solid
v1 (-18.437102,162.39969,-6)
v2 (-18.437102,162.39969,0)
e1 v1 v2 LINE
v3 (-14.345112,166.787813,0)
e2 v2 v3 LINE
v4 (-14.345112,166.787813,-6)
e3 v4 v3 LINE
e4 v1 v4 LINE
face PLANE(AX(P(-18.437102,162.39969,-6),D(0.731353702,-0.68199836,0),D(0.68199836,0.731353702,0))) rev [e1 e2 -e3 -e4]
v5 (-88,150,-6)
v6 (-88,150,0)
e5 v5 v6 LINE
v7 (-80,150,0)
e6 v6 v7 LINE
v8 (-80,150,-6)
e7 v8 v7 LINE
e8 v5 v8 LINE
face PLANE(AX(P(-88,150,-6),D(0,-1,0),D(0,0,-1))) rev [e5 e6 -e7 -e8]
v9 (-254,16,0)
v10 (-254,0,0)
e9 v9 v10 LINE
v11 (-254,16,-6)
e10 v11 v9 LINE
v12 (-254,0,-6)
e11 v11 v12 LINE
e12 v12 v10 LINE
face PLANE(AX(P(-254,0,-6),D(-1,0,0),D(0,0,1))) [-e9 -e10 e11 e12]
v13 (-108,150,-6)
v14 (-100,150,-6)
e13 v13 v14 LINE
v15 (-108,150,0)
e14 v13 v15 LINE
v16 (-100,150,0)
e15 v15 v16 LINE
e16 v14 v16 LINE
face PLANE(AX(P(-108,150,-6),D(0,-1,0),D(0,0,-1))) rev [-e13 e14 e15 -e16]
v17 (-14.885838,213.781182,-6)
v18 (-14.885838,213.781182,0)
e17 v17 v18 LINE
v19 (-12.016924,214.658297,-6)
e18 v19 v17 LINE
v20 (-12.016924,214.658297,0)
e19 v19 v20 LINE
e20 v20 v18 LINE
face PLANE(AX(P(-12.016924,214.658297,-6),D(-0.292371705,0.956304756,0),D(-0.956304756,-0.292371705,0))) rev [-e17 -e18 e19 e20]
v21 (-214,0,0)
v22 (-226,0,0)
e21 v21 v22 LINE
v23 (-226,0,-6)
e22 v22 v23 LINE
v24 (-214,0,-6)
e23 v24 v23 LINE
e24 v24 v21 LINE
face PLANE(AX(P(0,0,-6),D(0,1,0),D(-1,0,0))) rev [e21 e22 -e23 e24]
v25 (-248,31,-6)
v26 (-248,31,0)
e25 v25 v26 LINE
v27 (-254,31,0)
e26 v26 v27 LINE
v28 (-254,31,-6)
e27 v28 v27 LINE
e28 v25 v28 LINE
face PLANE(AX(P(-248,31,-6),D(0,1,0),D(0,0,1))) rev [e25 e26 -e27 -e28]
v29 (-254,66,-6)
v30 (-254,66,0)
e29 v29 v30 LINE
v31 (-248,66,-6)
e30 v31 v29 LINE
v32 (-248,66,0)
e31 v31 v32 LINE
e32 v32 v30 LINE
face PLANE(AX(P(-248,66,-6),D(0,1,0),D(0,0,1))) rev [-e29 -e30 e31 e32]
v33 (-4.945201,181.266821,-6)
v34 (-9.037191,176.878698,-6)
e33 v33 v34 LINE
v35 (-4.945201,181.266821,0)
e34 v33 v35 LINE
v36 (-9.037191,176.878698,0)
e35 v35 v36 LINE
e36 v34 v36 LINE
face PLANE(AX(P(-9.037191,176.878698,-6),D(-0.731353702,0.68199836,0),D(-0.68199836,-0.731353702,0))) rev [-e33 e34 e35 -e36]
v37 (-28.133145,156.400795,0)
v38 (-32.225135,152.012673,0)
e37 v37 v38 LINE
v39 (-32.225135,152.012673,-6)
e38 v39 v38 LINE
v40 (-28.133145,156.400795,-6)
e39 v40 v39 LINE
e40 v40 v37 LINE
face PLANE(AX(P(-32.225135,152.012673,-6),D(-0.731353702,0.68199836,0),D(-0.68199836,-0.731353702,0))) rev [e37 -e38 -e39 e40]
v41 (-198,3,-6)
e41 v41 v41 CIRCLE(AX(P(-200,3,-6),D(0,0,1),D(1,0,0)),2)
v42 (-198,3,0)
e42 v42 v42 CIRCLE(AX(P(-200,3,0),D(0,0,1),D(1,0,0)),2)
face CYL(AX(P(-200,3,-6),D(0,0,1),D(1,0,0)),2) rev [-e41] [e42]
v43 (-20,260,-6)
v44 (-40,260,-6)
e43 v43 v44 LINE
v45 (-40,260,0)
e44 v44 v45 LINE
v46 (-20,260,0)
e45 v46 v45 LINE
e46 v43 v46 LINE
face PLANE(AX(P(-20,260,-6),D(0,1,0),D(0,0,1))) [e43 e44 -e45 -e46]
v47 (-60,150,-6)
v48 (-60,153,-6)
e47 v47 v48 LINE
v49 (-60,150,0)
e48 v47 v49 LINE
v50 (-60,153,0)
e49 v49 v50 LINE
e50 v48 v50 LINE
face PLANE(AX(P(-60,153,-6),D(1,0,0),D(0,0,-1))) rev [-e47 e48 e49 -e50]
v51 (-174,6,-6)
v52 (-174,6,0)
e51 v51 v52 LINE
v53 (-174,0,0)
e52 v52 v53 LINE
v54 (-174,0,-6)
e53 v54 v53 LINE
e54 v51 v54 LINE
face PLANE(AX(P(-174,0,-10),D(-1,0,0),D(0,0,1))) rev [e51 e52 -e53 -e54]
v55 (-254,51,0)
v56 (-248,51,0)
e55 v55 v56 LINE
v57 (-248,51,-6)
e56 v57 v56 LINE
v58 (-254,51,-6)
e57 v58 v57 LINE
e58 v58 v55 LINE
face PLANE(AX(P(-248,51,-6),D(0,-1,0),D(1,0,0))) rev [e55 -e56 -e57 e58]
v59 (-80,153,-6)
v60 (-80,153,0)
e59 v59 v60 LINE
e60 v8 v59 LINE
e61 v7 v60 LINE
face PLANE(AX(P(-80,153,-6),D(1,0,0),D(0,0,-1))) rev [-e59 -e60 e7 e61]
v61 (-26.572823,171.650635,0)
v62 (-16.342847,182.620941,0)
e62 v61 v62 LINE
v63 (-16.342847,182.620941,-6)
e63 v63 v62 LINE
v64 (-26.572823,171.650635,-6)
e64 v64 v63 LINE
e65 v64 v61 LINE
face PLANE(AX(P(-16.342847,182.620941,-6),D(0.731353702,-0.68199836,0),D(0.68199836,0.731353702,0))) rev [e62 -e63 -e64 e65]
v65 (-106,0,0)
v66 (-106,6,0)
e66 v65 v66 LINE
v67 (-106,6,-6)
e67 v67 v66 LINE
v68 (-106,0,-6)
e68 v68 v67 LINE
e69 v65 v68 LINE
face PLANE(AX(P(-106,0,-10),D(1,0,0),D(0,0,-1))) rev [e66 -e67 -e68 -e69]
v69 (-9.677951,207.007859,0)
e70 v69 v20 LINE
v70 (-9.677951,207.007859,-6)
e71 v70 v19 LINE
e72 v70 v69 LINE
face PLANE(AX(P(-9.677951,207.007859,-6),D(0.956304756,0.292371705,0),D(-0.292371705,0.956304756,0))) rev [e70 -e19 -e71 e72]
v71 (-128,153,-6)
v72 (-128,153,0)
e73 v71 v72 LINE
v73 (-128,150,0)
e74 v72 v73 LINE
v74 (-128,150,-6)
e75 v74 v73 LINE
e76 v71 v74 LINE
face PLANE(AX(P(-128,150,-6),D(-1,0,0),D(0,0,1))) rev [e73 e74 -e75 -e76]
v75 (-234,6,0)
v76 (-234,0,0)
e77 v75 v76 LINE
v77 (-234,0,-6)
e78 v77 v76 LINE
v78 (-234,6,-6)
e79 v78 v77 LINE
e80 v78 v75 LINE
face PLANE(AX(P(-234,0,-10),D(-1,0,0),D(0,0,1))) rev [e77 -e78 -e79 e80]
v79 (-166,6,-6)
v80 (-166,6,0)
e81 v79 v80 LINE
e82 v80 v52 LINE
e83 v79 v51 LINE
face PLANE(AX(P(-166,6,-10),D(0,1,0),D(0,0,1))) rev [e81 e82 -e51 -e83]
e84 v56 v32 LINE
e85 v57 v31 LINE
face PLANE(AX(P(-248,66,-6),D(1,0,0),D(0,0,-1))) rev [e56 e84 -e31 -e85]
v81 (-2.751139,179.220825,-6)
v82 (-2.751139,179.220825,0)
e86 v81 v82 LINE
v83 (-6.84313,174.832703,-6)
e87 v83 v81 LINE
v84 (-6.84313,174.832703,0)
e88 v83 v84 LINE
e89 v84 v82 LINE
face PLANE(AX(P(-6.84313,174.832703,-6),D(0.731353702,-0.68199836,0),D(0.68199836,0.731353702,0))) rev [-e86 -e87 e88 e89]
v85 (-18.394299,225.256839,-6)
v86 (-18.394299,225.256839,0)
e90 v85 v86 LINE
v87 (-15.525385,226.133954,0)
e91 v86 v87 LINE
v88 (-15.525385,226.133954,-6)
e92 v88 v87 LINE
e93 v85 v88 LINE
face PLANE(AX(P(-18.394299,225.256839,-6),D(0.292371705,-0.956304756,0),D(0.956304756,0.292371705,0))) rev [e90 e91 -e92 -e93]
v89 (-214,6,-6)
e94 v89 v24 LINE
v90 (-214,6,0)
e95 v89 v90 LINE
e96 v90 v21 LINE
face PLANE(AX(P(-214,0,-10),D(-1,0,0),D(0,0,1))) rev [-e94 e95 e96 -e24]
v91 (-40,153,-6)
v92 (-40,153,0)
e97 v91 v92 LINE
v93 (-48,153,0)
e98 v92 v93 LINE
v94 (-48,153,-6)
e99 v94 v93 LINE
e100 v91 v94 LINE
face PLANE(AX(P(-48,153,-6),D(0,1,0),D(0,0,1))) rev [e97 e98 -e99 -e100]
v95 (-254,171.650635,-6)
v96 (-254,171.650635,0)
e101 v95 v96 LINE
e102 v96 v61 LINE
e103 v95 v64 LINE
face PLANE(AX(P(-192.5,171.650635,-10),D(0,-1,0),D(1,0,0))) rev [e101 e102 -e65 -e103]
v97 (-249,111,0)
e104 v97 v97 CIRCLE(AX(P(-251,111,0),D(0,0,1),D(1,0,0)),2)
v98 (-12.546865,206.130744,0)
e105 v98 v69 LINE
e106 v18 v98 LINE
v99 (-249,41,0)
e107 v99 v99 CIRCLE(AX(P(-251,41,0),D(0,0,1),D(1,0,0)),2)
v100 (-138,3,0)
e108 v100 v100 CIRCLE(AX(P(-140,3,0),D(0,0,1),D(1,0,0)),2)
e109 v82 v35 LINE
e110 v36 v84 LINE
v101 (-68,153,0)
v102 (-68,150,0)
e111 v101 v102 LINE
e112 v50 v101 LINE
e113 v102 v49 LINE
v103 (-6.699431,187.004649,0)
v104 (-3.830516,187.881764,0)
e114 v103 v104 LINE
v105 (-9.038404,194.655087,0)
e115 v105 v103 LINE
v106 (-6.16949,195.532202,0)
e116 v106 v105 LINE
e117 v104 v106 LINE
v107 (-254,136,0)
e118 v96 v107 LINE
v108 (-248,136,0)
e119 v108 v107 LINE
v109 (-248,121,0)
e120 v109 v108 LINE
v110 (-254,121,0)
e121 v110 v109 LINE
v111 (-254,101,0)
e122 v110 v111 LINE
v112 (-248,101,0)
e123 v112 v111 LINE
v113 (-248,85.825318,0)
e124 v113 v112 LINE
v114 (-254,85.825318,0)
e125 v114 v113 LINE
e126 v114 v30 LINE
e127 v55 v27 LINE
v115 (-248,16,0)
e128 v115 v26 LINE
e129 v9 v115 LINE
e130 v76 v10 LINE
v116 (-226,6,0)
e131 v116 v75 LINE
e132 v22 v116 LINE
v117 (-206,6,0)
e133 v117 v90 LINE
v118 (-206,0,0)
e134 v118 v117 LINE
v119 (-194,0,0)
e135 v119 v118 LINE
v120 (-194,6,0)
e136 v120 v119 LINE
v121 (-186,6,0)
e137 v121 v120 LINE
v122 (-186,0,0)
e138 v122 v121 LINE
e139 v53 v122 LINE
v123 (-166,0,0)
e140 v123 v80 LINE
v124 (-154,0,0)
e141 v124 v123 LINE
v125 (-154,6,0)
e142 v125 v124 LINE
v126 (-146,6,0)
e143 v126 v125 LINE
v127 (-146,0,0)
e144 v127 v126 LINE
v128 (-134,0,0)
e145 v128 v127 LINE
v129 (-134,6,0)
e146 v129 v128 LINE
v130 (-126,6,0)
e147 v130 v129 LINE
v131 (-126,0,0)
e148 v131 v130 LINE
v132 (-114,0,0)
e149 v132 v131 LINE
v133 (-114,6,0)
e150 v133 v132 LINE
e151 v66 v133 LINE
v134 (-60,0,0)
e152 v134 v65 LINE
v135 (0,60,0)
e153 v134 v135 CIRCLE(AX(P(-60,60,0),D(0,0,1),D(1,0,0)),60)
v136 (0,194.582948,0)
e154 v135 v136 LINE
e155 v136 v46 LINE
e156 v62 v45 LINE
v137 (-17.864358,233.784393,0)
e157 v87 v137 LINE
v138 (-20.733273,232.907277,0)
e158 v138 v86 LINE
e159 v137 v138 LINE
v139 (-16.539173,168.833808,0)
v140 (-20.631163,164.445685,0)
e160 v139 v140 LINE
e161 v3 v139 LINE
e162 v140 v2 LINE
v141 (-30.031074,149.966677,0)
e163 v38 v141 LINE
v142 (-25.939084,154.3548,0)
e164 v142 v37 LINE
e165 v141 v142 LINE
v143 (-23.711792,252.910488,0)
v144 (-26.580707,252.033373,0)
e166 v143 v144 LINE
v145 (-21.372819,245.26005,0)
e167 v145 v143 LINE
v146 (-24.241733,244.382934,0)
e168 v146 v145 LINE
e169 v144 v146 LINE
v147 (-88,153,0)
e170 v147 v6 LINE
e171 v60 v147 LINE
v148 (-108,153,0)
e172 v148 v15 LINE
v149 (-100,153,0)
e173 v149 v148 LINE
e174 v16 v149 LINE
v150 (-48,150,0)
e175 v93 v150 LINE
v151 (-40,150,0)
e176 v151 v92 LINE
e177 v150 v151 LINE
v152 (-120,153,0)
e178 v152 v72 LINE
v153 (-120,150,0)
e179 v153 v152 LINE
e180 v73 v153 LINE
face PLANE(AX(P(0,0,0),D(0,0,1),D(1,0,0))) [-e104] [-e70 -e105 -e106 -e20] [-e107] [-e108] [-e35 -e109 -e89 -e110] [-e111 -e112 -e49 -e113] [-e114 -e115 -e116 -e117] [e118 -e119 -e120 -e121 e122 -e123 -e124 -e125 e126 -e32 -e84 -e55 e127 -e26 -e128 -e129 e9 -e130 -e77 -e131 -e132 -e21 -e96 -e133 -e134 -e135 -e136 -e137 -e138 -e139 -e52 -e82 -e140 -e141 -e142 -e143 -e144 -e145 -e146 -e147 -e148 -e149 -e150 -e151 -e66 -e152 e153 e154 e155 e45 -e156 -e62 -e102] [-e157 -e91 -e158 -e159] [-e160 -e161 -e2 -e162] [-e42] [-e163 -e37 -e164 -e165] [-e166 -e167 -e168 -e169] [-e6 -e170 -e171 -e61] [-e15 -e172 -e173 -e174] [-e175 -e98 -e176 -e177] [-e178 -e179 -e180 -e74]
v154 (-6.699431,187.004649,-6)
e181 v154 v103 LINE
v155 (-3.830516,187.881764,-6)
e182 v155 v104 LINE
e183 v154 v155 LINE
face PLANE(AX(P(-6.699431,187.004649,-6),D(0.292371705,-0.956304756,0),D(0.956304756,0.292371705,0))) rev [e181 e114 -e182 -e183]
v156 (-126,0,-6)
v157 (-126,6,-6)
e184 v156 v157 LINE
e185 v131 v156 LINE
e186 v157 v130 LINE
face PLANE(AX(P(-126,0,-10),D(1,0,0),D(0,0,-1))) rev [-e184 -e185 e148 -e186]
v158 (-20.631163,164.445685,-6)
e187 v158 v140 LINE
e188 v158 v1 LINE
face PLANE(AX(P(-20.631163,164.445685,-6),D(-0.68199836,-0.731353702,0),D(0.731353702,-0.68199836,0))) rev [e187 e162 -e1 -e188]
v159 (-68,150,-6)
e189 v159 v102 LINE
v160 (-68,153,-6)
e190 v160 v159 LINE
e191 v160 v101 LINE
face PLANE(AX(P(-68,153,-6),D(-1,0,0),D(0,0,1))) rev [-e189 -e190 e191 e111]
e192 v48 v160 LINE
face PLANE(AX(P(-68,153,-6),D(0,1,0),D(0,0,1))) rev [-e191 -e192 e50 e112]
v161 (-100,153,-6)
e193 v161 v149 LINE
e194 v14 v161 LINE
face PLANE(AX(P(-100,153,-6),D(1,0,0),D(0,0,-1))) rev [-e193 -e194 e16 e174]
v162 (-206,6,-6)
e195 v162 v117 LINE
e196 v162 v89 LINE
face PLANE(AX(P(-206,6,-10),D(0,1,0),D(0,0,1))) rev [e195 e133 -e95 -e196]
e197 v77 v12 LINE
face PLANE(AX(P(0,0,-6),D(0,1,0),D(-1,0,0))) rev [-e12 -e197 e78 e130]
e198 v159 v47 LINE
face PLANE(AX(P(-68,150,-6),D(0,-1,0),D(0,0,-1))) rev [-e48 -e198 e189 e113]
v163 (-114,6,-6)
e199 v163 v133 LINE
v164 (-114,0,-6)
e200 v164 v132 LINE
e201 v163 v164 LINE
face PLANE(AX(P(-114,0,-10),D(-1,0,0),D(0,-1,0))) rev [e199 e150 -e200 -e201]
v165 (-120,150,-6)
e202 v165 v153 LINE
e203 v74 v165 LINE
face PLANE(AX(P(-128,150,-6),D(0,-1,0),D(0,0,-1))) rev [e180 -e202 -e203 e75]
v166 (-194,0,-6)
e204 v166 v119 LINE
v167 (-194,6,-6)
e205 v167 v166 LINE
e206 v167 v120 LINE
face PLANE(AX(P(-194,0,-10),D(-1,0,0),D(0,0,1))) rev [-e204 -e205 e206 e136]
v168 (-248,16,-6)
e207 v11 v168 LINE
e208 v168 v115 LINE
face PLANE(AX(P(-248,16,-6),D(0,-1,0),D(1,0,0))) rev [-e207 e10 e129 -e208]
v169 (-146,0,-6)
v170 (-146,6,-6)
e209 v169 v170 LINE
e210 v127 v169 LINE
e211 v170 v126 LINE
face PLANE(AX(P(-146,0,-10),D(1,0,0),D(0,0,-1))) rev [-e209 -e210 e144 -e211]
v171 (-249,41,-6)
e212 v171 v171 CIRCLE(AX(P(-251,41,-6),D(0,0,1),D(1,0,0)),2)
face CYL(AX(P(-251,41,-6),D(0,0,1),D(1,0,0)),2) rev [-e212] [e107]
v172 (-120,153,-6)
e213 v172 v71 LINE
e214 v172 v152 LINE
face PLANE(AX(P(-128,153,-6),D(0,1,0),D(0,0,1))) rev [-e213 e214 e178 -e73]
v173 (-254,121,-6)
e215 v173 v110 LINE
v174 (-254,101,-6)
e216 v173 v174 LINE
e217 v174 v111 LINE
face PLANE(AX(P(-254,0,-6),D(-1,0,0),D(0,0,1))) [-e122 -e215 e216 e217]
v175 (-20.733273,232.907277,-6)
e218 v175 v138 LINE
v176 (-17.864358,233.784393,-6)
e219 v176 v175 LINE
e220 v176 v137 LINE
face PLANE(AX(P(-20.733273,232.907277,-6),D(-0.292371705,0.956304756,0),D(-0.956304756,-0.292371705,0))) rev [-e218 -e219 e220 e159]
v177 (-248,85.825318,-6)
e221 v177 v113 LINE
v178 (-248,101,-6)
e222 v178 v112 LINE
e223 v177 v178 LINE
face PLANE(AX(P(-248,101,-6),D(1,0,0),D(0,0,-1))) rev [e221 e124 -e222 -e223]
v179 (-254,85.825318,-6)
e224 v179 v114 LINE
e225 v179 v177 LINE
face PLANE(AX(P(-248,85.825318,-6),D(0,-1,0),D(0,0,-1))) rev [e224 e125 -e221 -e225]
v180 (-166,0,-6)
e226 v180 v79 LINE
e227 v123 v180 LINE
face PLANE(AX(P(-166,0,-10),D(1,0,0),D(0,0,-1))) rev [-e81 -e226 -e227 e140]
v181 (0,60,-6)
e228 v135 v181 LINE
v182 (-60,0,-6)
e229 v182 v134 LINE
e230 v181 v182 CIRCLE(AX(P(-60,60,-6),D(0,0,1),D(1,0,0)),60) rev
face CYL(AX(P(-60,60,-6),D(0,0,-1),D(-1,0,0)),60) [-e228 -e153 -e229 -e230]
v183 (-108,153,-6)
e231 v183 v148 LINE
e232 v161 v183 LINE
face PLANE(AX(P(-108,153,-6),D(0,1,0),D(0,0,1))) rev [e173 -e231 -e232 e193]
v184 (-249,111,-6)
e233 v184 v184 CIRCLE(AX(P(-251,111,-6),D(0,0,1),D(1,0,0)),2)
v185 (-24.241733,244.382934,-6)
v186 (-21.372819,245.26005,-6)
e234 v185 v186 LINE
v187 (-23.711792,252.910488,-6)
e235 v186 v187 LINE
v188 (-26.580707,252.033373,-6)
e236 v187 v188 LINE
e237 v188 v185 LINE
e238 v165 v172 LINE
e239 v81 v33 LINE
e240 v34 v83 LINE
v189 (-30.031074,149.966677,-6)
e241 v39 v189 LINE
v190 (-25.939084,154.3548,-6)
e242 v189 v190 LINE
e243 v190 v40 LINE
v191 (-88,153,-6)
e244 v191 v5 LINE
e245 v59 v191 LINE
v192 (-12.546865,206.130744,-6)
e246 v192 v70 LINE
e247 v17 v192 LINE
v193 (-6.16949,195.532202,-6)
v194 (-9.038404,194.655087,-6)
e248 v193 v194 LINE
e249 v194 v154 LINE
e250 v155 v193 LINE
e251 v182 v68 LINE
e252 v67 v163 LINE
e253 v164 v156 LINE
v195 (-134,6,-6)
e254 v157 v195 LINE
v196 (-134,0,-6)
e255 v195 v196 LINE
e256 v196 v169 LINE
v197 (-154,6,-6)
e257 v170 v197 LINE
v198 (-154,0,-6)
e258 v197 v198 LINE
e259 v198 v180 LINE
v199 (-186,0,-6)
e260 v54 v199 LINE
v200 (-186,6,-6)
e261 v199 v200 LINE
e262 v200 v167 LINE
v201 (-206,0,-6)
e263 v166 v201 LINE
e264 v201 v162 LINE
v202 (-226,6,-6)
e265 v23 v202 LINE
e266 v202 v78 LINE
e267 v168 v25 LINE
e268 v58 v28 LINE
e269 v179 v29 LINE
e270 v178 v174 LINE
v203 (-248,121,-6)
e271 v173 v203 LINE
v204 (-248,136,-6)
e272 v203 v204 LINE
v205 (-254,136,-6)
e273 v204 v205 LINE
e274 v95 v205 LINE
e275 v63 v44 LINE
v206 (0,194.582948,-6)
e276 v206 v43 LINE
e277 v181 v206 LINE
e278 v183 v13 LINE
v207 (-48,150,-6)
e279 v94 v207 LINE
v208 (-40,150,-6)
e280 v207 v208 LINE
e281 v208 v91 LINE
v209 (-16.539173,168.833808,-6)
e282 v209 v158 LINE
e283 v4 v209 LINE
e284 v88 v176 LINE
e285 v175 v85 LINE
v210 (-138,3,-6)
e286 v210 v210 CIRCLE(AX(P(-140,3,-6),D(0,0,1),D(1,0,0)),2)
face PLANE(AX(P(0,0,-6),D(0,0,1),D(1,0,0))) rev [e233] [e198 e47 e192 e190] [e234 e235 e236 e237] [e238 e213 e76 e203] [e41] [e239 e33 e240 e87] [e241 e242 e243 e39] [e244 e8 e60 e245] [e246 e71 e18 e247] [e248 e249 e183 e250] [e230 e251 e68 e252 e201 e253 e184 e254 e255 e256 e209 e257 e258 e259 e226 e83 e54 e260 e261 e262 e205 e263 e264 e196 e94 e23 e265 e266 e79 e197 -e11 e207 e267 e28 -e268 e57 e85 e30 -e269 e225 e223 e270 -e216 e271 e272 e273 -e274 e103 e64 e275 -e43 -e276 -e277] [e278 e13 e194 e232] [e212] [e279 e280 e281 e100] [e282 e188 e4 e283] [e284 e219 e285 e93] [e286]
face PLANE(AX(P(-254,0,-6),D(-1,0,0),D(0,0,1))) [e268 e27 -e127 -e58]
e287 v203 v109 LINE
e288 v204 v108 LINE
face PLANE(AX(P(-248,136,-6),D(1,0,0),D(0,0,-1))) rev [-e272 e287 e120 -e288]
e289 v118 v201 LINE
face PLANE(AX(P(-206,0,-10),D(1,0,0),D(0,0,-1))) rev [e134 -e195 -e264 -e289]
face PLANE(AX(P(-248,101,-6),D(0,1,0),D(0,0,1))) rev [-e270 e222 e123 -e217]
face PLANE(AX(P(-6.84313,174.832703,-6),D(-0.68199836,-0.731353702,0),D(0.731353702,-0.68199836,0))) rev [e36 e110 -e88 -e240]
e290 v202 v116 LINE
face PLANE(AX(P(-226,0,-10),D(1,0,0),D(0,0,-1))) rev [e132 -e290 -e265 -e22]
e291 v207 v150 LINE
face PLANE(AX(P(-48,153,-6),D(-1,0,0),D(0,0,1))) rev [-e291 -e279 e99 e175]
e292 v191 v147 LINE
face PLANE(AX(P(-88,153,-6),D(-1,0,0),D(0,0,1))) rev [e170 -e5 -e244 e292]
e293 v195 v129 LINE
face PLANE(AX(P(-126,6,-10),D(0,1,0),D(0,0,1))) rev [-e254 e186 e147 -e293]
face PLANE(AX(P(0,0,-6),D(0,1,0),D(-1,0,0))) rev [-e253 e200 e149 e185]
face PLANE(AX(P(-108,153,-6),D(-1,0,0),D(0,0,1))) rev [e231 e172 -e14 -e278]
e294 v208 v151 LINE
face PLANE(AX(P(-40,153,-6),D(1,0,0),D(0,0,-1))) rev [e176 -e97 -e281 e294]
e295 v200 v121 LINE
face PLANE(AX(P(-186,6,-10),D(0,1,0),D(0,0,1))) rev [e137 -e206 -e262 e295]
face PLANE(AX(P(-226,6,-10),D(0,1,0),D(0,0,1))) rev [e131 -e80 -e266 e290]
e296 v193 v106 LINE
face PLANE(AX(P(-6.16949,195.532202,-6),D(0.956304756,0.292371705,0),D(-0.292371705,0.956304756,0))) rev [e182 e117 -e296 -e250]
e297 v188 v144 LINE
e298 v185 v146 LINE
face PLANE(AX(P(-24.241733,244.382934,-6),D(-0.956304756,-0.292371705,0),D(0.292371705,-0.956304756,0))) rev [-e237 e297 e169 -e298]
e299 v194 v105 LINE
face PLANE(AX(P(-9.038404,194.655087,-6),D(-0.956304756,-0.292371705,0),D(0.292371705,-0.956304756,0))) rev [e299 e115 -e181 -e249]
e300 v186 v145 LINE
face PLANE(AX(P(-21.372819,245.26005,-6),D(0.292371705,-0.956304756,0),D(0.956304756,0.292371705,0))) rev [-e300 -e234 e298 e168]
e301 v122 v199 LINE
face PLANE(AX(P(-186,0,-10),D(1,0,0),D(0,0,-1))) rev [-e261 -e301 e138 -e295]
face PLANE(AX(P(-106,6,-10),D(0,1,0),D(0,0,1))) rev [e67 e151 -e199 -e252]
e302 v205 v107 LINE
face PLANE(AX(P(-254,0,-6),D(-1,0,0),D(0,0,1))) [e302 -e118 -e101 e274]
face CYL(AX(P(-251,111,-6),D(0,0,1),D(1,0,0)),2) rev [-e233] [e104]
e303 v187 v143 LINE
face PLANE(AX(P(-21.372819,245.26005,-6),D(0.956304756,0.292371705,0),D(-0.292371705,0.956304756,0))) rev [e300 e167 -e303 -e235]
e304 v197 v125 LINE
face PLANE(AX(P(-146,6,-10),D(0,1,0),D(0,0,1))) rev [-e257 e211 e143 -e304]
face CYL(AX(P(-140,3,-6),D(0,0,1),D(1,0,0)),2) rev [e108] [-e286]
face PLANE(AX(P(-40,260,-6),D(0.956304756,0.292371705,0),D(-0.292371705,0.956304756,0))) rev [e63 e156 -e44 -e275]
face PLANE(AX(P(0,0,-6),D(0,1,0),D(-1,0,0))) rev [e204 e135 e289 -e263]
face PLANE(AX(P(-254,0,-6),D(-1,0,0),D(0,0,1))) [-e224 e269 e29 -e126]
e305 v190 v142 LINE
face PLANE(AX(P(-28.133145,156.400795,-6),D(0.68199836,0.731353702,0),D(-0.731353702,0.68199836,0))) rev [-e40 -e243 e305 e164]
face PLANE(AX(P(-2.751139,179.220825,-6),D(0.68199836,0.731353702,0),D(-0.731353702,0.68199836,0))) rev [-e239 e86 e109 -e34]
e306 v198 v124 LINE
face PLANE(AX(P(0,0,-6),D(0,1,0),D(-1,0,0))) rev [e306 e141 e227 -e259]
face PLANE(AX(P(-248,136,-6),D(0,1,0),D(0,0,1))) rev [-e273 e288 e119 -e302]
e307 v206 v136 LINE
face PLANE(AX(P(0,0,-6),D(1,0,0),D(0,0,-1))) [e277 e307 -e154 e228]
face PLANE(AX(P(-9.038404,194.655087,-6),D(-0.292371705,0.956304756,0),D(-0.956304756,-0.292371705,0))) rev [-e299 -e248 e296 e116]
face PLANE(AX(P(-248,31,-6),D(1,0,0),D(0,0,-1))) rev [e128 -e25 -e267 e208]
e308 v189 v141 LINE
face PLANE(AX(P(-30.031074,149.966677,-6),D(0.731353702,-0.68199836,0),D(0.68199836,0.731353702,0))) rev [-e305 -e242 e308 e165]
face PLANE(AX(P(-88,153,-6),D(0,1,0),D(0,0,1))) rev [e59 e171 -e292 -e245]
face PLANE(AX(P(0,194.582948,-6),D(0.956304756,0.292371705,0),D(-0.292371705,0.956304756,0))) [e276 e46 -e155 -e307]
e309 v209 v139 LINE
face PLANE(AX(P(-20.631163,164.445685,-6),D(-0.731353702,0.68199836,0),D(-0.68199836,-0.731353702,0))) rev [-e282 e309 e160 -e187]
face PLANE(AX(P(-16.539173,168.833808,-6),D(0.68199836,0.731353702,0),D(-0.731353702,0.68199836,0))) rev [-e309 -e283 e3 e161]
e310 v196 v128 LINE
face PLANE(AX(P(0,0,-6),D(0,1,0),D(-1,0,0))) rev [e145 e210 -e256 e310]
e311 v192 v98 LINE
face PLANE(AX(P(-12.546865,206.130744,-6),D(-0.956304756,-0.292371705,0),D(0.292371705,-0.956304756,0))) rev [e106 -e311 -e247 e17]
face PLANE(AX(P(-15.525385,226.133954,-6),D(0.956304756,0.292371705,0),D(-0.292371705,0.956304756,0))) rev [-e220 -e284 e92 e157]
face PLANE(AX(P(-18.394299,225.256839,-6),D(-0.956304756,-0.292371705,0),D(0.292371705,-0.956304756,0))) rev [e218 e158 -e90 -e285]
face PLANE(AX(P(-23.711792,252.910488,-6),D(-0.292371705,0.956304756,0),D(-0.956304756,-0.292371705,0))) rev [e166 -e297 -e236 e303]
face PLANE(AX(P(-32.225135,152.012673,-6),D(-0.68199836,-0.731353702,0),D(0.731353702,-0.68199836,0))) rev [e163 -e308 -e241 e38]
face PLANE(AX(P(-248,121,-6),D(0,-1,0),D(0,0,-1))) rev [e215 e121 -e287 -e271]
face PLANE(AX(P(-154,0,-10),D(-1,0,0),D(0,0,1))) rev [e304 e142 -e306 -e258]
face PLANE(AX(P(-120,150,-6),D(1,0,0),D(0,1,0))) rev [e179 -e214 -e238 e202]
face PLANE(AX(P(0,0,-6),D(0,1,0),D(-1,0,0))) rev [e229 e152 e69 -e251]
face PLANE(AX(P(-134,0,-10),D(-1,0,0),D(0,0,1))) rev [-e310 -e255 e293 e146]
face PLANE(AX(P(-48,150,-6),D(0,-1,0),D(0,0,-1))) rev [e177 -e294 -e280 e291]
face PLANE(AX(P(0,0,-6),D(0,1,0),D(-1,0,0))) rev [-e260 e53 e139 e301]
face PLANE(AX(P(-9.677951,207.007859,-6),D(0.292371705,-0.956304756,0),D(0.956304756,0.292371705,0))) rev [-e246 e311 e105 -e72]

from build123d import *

# Parameters (mm, degrees)
ESQUISSE1_W              = 340
ESQUISSE1_H              = 260
BOSS_EXTRU_1_DEPTH       = 6
CONG_1_R                 = 60
ESQUISSE14_W             = 180
ESQUISSE14_H             = 10
ENL_V_MAT_EXTRU_7_DEPTH  = 10
ESQUISSE15_W             = 120
ESQUISSE15_H             = 2
ENL_V_MAT_EXTRU_8_DEPTH  = 10
CONG_2_R                 = 10
CONG_3_R                 = 8
ENL_V_MAT_EXTRU_10_DEPTH = 10
ESQUISSE18_W             = 8
ESQUISSE18_H             = 6
ENL_V_MAT_EXTRU_11_DEPTH = 10
ENL_V_MAT_EXTRU_13_DEPTH = 6
ENL_V_MAT_EXTRU_14_DEPTH = 10
ESQUISSE21_W             = 95
ESQUISSE21_H             = 171.650635095
ENL_V_MAT_EXTRU_15_DEPTH = 10
BOSS_EXTRU_3_DEPTH       = 6
ENL_V_MAT_EXTRU_18_DEPTH = 6
ESQUISSE25_W             = 8
ESQUISSE25_H             = 3
ENL_V_MAT_EXTRU_17_DEPTH = 6
ESQUISSE30_W             = 9
ESQUISSE30_H             = 171.650635095
BOSS_EXTRU_4_DEPTH       = 6
ESQUISSE32_W             = 6
ESQUISSE32_H             = 15
ESQUISSE32_H_2           = 15.174682453
ENL_V_MAT_EXTRU_19_DEPTH = 6
ESQUISSE33_R             = 2
ENL_V_MAT_EXTRU_20_DEPTH = 364.527165422


with BuildPart() as part:
    # Esquisse1 → Boss.-Extru.1 (new body)
    with BuildSketch(Plane.XY):
        with Locations((-170, 130)):
            Rectangle(ESQUISSE1_W, ESQUISSE1_H)
    extrude(amount=-BOSS_EXTRU_1_DEPTH)

    # Congé1
    cong_1_edges = [part.edges().sort_by_distance(p)[0] for p in [
        (0, 0, -3),
        (-340, 0, -3),
    ]]
    fillet(cong_1_edges, radius=CONG_1_R)

    # Esquisse14 → Enlèv. mat.-Extru.7 (cut)
    with BuildSketch(Plane(origin=(0, 0, -6), x_dir=(-1, 0, 0), z_dir=(0, 0, -1))):
        with Locations((235, 255)):
            Rectangle(ESQUISSE14_W, ESQUISSE14_H)
    extrude(amount=-ENL_V_MAT_EXTRU_7_DEPTH, mode=Mode.SUBTRACT)

    # Esquisse15 → Enlèv. mat.-Extru.8 (cut)
    with BuildSketch(Plane.XY):
        with Locations((-250, 249)):
            Rectangle(ESQUISSE15_W, ESQUISSE15_H)
    extrude(amount=-ENL_V_MAT_EXTRU_8_DEPTH, mode=Mode.SUBTRACT)

    # Congé2
    # the kernel refuses this fillet: 10 mm, written as the material it takes off along each edge
    with BuildSketch(Plane(origin=(-190, 250, 15), x_dir=(1, 0, 0), z_dir=(0, 0, -1))) as cong_2_piece_1:
        with BuildLine():
            CenterArc((6, 10), CONG_2_R, 233.130102354, 36.869897646)
            Line((0, 2), (-0.12, 1.84))
            ThreePointArc((-0.12, 1.84), (-0.2, 1), (-0.2, 0))
            Line((-0.2, 0), (0, -0.2))
            Line((0, -0.2), (6, -0.2))
            Line((6, -0.2), (6, 0))
        make_face()
    extrude(amount=36, mode=Mode.SUBTRACT)
    with BuildSketch(Plane(origin=(-310, 250, 15), x_dir=(0, -1, 0), z_dir=(0, 0, -1))) as cong_2_piece_2:
        with BuildLine():
            CenterArc((10, 6), CONG_2_R, 180, 36.869897646)
            Line((0, 6), (-0.2, 6))
            Line((-0.2, 6), (-0.2, 0))
            Line((-0.2, 0), (0, -0.2))
            ThreePointArc((0, -0.2), (1, -0.2), (1.84, -0.12))
            Line((1.84, -0.12), (2, 0))
        make_face()
    extrude(amount=36, mode=Mode.SUBTRACT)

    # Congé3
    cong_3_edges = [part.edges().sort_by_distance(p)[0] for p in [
        (-145, 260, -3),
        (-325, 260, -3),
    ]]
    fillet(cong_3_edges, radius=CONG_3_R)

    # Esquisse17 → Enlèv. mat.-Extru.10 (cut)
    with BuildSketch(Plane.XY):
        Polygon((-29.216285169, 245.39755551), (-23.478456633, 247.151785738), (-25.817430271, 254.802223786), (-31.555258806, 253.047993558), align=None)
        Polygon((-23.368851074, 226.271460391), (-17.631022538, 228.025690619), (-19.969996176, 235.676128667), (-25.707824712, 233.921898438), align=None)
        Polygon((-17.52141698, 207.145365271), (-11.783588444, 208.8995955), (-14.122562082, 216.550033547), (-19.860390617, 214.795803319), align=None)
        Polygon((-180, 150), (-30, 150), (-2.720065597, 179.254148065), (-9.568281369, 188.663047712), (-5.936154349, 189.77350038), (-8.275127987, 197.423938428), (-14.012956523, 195.6697082), (-13.538488979, 194.117794792), (-102.15398245, 315.868381088), (-205, 193.301270189), align=None)
    extrude(amount=-ENL_V_MAT_EXTRU_10_DEPTH, mode=Mode.SUBTRACT)

    # Esquisse18 → Enlèv. mat.-Extru.11 (cut)
    with BuildSketch(Plane.XY):
        with Locations((-110, 3)):
            Rectangle(ESQUISSE18_W, ESQUISSE18_H)
        with Locations((-130, 3)):
            Rectangle(ESQUISSE18_W, ESQUISSE18_H)
        with Locations((-150, 3)):
            Rectangle(ESQUISSE18_W, ESQUISSE18_H)
        with Locations((-170, 3)):
            Rectangle(ESQUISSE18_W, ESQUISSE18_H)
        with Locations((-190, 3)):
            Rectangle(ESQUISSE18_W, ESQUISSE18_H)
        with Locations((-210, 3)):
            Rectangle(ESQUISSE18_W, ESQUISSE18_H)
        with Locations((-230, 3)):
            Rectangle(ESQUISSE18_W, ESQUISSE18_H)
    extrude(amount=-ENL_V_MAT_EXTRU_11_DEPTH, mode=Mode.SUBTRACT)

    # Esquisse19 → Enlèv. mat.-Extru.13 (cut)
    with BuildSketch(Plane.XY):
        Polygon((-27.406549935, 260), (-61.490489073, 260), (-13.538488979, 194.117794792), (-14.012956523, 195.6697082), (-8.275127987, 197.423938428), (-5.936154349, 189.77350038), (-9.568281369, 188.663047712), (-2.720065597, 179.254148065), (0, 179.254148065), (0, 193.164126288), (0, 260), align=None)
        Polygon((-19.860390617, 214.795803319), (-14.122562082, 216.550033547), (-11.783588444, 208.8995955), (-17.52141698, 207.145365271), align=None, mode=Mode.SUBTRACT)
        Polygon((-25.707824712, 233.921898438), (-19.969996176, 235.676128667), (-17.631022538, 228.025690619), (-23.368851074, 226.271460391), align=None, mode=Mode.SUBTRACT)
        Polygon((-23.478456633, 247.151785738), (-29.216285169, 245.39755551), (-31.555258806, 253.047993558), (-25.817430271, 254.802223786), align=None, mode=Mode.SUBTRACT)
    extrude(amount=-ENL_V_MAT_EXTRU_13_DEPTH, mode=Mode.SUBTRACT)

    # Esquisse20 → Enlèv. mat.-Extru.14 (cut)
    with BuildSketch(Plane.XY):
        Polygon((-192.5, 171.650635095), (-340, 171.650635095), (-340, 260), (-157.424116728, 260.642727797), (-157.424116728, 250), align=None)
    extrude(amount=-ENL_V_MAT_EXTRU_14_DEPTH, mode=Mode.SUBTRACT)

    # Esquisse21 → Enlèv. mat.-Extru.15 (cut)
    with BuildSketch(Plane.XY):
        with Locations((-292.5, 85.825317548)):
            Rectangle(ESQUISSE21_W, ESQUISSE21_H)
    extrude(amount=-ENL_V_MAT_EXTRU_15_DEPTH, mode=Mode.SUBTRACT)

    # Esquisse27 → Boss.-Extru.3 (add)
    with BuildSketch(Plane.XY):
        Polygon((0, 179.254148065), (0, 194.58294763), (-20, 260), (-40, 260), (-192.5, 171.650635095), (-180, 150), (-30, 150), align=None)
    extrude(amount=-BOSS_EXTRU_3_DEPTH)

    # Esquisse29 → Enlèv. mat.-Extru.18 (cut)
    with BuildSketch(Plane.XY):
        Polygon((-40, 260), (-16.342847445, 182.620940619), (-26.572822846, 171.650635095), (-192.5, 171.650635095), align=None)
    extrude(amount=-ENL_V_MAT_EXTRU_18_DEPTH, mode=Mode.SUBTRACT)

    # Esquisse25 → Enlèv. mat.-Extru.17 (cut)
    with BuildSketch(Plane.XY):
        with Locations((-124, 151.5)):
            Rectangle(ESQUISSE25_W, ESQUISSE25_H)
        with Locations((-104, 151.5)):
            Rectangle(ESQUISSE25_W, ESQUISSE25_H)
        with Locations((-84, 151.5)):
            Rectangle(ESQUISSE25_W, ESQUISSE25_H)
        with Locations((-64, 151.5)):
            Rectangle(ESQUISSE25_W, ESQUISSE25_H)
        with Locations((-44, 151.5)):
            Rectangle(ESQUISSE25_W, ESQUISSE25_H)
        Polygon((-32.225134911, 152.012672503), (-28.133144751, 156.400794713), (-25.939083646, 154.354799632), (-30.031073806, 149.966677423), align=None)
        Polygon((-20.63116279, 164.44568543), (-18.437101685, 162.39969035), (-14.345111525, 166.78781256), (-16.53917263, 168.83380764), align=None)
        Polygon((-6.843129564, 174.832703278), (-9.037190669, 176.878698358), (-4.945200508, 181.266820568), (-2.751139404, 179.220825487), align=None)
        Polygon((-9.038404375, 194.655087151), (-6.169490107, 195.532202265), (-3.830516469, 187.881764218), (-6.699430737, 187.004649103), align=None)
        Polygon((-9.677950563, 207.007859337), (-12.546864831, 206.130744223), (-14.885838469, 213.78118227), (-12.016924201, 214.658297384), align=None)
        Polygon((-18.394298926, 225.256839342), (-15.525384658, 226.133954456), (-17.864358296, 233.784392504), (-20.733272563, 232.90727739), align=None)
        Polygon((-21.372818752, 245.260049575), (-23.71179239, 252.910487623), (-26.580706658, 252.033372509), (-24.24173302, 244.382934461), align=None)
    extrude(amount=-ENL_V_MAT_EXTRU_17_DEPTH, mode=Mode.SUBTRACT)

    # Esquisse30 → Boss.-Extru.4 (add)
    with BuildSketch(Plane.XY):
        with Locations((-249.5, 85.825317548)):
            Rectangle(ESQUISSE30_W, ESQUISSE30_H)
    extrude(amount=-BOSS_EXTRU_4_DEPTH)

    # Esquisse32 → Enlèv. mat.-Extru.19 (cut)
    with BuildSketch(Plane.XY):
        with Locations((-251, 128.5)):
            Rectangle(ESQUISSE32_W, ESQUISSE32_H)
        with Locations((-251, 93.412658773)):
            Rectangle(ESQUISSE32_W, ESQUISSE32_H_2)
        with Locations((-251, 58.5)):
            Rectangle(ESQUISSE32_W, ESQUISSE32_H)
        with Locations((-251, 23.5)):
            Rectangle(ESQUISSE32_W, ESQUISSE32_H)
    extrude(amount=-ENL_V_MAT_EXTRU_19_DEPTH, mode=Mode.SUBTRACT)

    # Esquisse33 → Enlèv. mat.-Extru.20 (cut, through all)
    with BuildSketch(Plane.XY):
        with Locations((-200, 3)):
            Circle(ESQUISSE33_R)
        with Locations((-140, 3)):
            Circle(ESQUISSE33_R)
        with Locations((-251, 41)):
            Circle(ESQUISSE33_R)
        with Locations((-251, 111)):
            Circle(ESQUISSE33_R)
    extrude(amount=-ENL_V_MAT_EXTRU_20_DEPTH, mode=Mode.SUBTRACT)


solid = part.part
